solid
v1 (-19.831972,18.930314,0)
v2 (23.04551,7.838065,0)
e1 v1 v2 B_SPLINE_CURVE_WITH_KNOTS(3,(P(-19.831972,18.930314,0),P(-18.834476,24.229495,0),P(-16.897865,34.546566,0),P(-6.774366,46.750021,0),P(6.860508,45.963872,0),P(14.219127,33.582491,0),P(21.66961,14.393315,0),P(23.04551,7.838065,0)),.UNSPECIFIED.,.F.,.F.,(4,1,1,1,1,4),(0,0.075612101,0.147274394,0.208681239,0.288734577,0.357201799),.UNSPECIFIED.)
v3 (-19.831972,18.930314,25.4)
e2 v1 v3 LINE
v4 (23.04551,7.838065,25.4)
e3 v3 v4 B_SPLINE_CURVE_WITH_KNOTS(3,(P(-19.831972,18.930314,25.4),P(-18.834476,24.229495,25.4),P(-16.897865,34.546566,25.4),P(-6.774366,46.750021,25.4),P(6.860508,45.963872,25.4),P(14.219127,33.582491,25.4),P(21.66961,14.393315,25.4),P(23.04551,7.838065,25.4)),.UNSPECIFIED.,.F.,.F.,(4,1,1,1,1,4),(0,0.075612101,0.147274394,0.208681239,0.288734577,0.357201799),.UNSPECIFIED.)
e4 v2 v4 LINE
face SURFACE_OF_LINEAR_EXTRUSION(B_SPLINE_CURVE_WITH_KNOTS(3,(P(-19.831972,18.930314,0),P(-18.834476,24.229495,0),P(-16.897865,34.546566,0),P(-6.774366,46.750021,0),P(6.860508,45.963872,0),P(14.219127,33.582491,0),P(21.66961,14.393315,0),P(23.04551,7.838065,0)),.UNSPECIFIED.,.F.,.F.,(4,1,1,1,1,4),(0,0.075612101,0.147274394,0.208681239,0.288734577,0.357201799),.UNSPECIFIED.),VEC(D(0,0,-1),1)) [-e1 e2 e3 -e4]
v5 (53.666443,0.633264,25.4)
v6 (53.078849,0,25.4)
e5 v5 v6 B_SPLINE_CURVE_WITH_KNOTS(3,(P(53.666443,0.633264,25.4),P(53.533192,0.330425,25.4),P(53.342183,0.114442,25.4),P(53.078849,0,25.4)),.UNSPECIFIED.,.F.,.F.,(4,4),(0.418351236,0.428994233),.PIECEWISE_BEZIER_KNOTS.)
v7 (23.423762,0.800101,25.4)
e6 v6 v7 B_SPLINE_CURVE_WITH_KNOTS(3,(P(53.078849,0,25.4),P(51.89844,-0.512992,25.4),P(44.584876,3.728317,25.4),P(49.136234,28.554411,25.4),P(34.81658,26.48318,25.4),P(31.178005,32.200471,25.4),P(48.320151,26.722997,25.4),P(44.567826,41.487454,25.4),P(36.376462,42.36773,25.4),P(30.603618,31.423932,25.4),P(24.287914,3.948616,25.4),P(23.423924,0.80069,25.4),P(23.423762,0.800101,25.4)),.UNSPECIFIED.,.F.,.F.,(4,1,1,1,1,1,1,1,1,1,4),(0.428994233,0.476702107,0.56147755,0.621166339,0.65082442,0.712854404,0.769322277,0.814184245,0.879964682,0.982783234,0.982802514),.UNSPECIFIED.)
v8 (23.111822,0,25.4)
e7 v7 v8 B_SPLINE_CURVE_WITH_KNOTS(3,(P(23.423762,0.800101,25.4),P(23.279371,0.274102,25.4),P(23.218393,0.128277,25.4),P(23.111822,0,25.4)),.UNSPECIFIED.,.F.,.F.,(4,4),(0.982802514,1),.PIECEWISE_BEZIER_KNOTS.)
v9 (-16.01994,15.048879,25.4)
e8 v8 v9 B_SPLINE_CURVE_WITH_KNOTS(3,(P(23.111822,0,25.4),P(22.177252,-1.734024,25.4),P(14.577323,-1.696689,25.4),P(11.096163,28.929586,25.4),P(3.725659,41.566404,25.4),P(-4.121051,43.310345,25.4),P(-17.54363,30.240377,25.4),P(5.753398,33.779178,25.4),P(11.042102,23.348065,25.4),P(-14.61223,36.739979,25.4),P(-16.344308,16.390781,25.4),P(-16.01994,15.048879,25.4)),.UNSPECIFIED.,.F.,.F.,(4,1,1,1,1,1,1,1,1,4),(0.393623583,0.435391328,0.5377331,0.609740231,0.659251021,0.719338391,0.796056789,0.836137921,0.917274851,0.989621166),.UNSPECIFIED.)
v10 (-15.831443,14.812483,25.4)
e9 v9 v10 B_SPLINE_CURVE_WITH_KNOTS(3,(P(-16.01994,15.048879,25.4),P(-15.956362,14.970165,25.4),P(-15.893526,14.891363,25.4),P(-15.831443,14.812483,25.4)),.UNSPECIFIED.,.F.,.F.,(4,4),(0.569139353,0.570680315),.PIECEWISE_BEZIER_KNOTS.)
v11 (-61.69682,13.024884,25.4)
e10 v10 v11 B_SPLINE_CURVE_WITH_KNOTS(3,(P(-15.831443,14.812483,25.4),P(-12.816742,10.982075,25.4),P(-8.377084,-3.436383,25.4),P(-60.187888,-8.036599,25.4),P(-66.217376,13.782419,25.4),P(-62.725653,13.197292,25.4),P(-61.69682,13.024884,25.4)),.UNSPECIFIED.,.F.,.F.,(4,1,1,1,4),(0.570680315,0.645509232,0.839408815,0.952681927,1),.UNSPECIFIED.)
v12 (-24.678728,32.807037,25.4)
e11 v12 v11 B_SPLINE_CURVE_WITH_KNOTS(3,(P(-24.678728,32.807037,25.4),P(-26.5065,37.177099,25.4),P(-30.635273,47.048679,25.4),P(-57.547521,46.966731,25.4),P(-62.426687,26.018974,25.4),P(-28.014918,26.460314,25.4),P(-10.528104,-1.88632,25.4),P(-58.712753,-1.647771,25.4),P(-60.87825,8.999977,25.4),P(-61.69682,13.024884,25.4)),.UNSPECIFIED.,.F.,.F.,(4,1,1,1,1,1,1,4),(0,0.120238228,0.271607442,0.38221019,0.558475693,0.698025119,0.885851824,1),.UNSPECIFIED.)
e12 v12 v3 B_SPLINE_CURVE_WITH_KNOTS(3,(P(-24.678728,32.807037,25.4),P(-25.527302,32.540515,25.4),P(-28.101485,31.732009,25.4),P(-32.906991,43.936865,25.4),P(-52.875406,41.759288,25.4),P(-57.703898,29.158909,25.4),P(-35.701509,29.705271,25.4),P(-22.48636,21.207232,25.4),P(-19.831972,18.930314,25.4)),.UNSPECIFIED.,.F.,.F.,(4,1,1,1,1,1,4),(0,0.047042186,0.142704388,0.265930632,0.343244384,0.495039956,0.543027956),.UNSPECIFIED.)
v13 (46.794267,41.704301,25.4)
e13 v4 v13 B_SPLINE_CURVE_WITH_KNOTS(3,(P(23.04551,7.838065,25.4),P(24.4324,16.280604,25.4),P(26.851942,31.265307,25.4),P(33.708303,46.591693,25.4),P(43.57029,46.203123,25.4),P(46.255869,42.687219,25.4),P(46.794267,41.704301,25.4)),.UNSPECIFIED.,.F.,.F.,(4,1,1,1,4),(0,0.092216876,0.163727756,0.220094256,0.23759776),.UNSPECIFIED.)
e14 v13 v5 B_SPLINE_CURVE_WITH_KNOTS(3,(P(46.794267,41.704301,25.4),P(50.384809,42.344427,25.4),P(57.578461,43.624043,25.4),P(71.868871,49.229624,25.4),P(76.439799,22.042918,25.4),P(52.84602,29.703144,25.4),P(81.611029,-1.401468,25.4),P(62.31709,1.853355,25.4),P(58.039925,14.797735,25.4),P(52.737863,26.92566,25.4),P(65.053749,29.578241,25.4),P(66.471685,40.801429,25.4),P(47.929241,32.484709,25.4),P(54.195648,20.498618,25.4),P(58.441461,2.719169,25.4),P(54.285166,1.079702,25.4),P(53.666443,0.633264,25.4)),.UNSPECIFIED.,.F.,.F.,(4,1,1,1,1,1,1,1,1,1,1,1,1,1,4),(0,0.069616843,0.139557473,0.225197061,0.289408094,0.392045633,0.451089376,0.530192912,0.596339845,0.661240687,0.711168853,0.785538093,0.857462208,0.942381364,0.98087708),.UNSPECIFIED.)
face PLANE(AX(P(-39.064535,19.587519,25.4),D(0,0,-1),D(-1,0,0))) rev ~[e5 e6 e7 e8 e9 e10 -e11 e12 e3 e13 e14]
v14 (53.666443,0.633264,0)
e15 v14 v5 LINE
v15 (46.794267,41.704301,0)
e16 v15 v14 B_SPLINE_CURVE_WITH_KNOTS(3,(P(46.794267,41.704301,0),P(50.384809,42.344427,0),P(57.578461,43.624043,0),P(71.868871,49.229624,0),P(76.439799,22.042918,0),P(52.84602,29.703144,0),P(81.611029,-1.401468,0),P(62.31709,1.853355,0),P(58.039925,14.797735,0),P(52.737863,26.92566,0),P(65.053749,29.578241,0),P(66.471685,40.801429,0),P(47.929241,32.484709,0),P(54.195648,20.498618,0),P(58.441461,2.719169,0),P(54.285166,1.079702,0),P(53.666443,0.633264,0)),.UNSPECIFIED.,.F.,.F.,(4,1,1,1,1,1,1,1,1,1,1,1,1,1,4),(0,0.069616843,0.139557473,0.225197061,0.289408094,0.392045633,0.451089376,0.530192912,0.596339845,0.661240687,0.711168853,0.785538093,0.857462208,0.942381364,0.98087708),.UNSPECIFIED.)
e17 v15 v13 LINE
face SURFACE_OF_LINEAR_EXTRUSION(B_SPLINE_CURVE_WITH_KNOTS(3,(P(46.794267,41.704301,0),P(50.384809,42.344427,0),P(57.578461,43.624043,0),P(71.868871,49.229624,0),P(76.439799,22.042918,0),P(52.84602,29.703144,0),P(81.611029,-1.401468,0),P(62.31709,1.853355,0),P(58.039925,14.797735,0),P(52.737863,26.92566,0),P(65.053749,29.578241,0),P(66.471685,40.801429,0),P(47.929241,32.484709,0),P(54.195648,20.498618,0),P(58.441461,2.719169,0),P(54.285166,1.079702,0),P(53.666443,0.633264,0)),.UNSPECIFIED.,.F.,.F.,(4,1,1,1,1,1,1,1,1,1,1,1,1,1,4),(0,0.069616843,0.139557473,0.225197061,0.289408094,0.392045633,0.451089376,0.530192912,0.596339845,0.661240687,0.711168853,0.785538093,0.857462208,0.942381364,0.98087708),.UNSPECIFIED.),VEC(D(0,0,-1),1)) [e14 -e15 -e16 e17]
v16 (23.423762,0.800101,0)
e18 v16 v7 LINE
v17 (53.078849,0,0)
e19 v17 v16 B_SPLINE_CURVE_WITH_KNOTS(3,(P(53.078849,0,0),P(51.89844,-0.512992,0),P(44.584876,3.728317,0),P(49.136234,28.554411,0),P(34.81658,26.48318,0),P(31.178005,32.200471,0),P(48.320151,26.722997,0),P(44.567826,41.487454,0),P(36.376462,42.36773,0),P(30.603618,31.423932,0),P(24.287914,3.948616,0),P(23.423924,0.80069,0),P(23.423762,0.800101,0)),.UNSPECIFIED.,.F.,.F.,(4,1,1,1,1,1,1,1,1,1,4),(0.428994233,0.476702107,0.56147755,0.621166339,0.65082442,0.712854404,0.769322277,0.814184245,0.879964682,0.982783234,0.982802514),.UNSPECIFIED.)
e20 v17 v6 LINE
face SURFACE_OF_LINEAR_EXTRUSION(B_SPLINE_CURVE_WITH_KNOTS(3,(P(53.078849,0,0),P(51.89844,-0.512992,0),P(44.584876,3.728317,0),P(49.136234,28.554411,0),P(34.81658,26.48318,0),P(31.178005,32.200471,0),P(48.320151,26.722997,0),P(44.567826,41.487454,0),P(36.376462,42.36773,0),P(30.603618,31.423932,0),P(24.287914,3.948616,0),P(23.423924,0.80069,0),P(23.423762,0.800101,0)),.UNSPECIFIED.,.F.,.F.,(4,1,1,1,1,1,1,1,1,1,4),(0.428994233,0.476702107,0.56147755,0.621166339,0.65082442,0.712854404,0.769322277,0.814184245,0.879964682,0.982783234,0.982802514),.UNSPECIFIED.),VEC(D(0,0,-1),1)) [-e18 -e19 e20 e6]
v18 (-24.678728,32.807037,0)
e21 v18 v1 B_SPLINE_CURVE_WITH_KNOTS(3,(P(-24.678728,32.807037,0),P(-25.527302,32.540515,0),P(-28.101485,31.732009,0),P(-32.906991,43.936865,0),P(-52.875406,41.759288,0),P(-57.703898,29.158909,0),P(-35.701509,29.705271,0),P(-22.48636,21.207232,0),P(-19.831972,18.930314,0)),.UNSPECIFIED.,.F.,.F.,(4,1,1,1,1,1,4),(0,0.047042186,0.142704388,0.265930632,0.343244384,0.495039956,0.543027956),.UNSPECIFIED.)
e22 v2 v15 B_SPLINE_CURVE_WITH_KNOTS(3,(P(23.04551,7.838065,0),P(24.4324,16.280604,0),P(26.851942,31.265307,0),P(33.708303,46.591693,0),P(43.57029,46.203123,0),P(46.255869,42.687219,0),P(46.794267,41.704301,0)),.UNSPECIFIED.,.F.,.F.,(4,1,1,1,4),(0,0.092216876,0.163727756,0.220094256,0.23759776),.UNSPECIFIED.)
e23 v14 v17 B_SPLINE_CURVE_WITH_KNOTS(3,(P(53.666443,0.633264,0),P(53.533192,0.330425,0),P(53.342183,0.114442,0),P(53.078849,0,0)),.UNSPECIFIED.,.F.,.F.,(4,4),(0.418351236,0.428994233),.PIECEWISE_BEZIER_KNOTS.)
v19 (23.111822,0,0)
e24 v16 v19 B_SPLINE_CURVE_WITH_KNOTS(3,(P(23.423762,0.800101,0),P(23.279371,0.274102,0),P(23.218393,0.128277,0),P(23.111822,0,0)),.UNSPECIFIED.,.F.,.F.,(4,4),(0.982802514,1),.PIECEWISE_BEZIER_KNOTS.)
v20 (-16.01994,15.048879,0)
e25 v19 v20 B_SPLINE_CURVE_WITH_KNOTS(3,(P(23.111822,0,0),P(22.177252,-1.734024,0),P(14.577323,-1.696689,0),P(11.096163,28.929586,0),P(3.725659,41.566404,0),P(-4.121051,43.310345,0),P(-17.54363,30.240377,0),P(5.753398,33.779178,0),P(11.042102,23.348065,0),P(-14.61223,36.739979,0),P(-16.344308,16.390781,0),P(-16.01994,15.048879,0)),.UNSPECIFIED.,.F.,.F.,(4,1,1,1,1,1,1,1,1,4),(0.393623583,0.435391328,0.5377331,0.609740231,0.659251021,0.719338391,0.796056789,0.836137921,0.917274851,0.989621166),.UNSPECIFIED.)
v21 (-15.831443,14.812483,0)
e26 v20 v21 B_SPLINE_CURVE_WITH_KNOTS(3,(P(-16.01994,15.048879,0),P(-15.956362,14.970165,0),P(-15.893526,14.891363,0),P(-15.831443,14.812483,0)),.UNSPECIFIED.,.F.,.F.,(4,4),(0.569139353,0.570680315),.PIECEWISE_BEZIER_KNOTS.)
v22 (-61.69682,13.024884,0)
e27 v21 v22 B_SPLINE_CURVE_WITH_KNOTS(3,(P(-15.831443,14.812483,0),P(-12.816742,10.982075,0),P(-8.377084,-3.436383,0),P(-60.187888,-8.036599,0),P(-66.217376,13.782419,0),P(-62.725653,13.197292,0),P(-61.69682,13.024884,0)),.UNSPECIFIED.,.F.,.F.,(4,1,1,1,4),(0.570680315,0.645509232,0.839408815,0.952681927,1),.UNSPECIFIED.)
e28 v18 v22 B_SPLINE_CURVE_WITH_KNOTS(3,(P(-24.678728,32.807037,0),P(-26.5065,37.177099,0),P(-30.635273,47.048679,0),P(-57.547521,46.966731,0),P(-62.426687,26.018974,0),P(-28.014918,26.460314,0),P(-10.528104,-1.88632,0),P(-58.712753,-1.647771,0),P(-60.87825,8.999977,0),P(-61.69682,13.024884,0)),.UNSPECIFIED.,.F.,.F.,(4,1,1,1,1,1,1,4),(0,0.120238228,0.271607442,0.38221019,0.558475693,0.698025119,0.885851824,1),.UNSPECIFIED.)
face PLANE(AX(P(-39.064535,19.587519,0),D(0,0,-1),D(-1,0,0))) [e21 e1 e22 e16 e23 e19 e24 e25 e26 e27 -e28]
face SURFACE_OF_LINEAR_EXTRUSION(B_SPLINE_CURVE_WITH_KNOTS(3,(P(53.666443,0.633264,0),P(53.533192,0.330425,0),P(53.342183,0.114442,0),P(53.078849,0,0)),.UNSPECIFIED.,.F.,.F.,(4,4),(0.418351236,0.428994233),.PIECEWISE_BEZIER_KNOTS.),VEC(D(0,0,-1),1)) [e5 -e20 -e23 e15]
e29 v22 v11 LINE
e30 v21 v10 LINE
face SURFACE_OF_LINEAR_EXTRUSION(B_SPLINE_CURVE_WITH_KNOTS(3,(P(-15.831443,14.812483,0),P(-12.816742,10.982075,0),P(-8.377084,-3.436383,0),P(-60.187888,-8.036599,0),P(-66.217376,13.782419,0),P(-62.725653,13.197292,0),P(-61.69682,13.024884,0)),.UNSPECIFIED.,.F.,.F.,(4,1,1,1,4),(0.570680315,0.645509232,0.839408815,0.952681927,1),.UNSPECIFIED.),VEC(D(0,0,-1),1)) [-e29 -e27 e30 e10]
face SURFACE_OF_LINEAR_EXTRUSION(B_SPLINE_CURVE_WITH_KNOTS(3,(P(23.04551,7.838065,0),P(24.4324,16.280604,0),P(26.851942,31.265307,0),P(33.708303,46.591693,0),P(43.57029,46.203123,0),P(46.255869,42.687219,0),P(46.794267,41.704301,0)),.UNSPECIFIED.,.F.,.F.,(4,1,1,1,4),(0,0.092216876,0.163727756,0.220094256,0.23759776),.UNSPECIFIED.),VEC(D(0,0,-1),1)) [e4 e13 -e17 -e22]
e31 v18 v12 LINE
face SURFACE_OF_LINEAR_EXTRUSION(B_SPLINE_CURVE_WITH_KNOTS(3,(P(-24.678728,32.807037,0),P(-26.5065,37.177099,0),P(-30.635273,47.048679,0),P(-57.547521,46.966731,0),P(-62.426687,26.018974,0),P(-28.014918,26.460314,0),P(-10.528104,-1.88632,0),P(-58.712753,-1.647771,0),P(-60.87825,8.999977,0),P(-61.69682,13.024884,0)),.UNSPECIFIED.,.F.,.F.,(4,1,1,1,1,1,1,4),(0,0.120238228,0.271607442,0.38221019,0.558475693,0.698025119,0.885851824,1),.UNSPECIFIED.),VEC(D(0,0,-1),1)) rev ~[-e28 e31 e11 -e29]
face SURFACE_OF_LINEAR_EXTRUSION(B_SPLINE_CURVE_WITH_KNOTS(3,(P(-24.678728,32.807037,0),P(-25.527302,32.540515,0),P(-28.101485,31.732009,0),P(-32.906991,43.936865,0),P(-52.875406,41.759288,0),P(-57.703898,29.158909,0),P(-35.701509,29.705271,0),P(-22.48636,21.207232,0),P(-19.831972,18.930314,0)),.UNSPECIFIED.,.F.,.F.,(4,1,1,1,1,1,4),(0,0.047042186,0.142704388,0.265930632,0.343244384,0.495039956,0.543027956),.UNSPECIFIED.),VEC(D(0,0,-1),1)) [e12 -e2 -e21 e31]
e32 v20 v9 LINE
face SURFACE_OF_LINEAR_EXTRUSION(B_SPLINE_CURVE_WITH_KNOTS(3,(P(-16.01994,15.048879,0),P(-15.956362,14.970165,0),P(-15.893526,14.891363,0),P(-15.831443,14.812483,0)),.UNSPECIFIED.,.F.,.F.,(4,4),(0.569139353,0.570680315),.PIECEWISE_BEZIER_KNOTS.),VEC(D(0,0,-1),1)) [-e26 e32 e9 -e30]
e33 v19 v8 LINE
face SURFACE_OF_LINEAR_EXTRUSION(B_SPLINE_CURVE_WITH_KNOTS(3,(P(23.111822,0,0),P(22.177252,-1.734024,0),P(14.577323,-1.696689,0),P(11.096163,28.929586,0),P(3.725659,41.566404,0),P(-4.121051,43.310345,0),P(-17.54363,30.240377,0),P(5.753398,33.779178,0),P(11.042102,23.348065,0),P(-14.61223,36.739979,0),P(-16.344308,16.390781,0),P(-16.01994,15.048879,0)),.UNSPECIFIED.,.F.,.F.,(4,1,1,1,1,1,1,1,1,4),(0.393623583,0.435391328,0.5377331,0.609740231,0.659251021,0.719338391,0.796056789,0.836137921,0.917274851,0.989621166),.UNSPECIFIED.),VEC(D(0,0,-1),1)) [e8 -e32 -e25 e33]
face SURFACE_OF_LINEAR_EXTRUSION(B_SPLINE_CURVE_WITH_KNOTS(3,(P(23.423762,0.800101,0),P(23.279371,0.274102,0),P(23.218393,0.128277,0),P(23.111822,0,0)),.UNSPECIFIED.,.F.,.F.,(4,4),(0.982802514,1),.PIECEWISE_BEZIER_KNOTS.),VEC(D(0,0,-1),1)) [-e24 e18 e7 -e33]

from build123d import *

# Parameters (mm, degrees)
F1_DEPTH = 25.4


# Not quite as in the source:
# - ends of sketch curves that miss each other by under 0.0002 mm in the source are joined


with BuildPart() as f1:
    # F0 (on Top) → F1 (new body)
    with BuildSketch(Plane.XY):
        with BuildLine():
            add(Edge.make_bspline(
                [(-24.6787276119, 32.8070372343), (-25.5273015557, 32.5405150057), (-28.1014851586, 31.7320089754), (-32.90699094, 43.9368654397), (-52.875406472, 41.759288149), (-57.7038976314, 29.1589085216), (-35.7015094106, 29.7052712427), (-22.4863598149, 21.2072316293), (-19.8319724851, 18.9303140968)],
                knots=[0, 0, 0, 0, 0.0470421865, 0.1427043876, 0.2659306317, 0.3432443836, 0.4950399565, 0.5430279559, 0.5430279559, 0.5430279559, 0.5430279559], degree=3))
            add(Edge.make_bspline(
                [(-24.6787276119, 32.8070372343), (-26.5064995292, 37.1770989066), (-30.6352734039, 47.0486787753), (-57.5475208508, 46.96673089), (-62.4266866267, 26.0189740304), (-28.0149183626, 26.4603141136), (-10.52810376, -1.8863198777), (-58.7127529187, -1.6477709858), (-60.8782500601, 8.9999767274), (-61.6968199611, 13.0248842761)],
                knots=[0, 0, 0, 0, 0.1202382283, 0.2716074424, 0.38221019, 0.5584756929, 0.6980251192, 0.8858518243, 1, 1, 1, 1], degree=3))
            add(Edge.make_bspline(
                [(-15.8314434419, 14.8124826193), (-12.8167424406, 10.9820745517), (-8.3770839751, -3.436383487), (-60.1878877743, -8.036598746), (-66.2173758507, 13.782419329), (-62.7256533774, 13.1972916958), (-61.6968199611, 13.0248842761)],
                knots=[0.5706803148, 0.5706803148, 0.5706803148, 0.5706803148, 0.6455092316, 0.8394088149, 0.9526819274, 1, 1, 1, 1], degree=3))
            add(Edge.make_bspline(
                [(-16.0199403512, 15.048879084), (-15.97340642, 14.8563692593), (-15.9033936949, 14.8336509493), (-15.8314434419, 14.8124826193)],
                knots=[0.9896211656, 0.9896211656, 0.9896211656, 0.9896211656, 1, 1, 1, 1], degree=3))
            add(Edge.make_bspline(
                [(-19.8319724851, 18.9303140968), (-18.387658044, 17.6913898312), (-17.0972678041, 16.3826850288), (-16.0199403512, 15.048879084)],
                knots=[0.5430279559, 0.5430279559, 0.5430279559, 0.5430279559, 0.5691393526, 0.5691393526, 0.5691393526, 0.5691393526], degree=3))
        make_face()
        with BuildLine():
            add(Edge.make_bspline(
                [(-19.8319724851, 18.9303140968), (-18.8344760031, 24.2294951854), (-16.8978653598, 34.5465657632), (-6.7743663409, 46.7500210317), (6.8605077442, 45.9638720477), (14.2191273717, 33.5824908681), (21.6696104289, 14.3933148786), (23.0455104144, 7.8380652192)],
                knots=[0, 0, 0, 0, 0.0756121009, 0.147274394, 0.2086812387, 0.2887345767, 0.3572017989, 0.3572017989, 0.3572017989, 0.3572017989], degree=3))
            add(Edge.make_bspline(
                [(-19.8319724851, 18.9303140968), (-18.387658044, 17.6913898312), (-17.0972678041, 16.3826850288), (-16.0199403512, 15.048879084)],
                knots=[0.5430279559, 0.5430279559, 0.5430279559, 0.5430279559, 0.5691393526, 0.5691393526, 0.5691393526, 0.5691393526], degree=3))
            add(Edge.make_bspline(
                [(23.1118220836, 0), (22.177252315, -1.7340239565), (14.5773230299, -1.6966887198), (11.0961627452, 28.9295857186), (3.7256594235, 41.5664043956), (-4.1210514113, 43.3103447304), (-17.5436302823, 30.2403774921), (5.7533981015, 33.779177956), (11.0421016778, 23.3480646444), (-14.612230045, 36.7399787183), (-16.3443080286, 16.3907808564), (-16.0199403512, 15.048879084)],
                knots=[0.393623583, 0.393623583, 0.393623583, 0.393623583, 0.4353913281, 0.5377331001, 0.609740231, 0.6592510214, 0.7193383912, 0.7960567893, 0.8361379212, 0.917274851, 0.9896211656, 0.9896211656, 0.9896211656, 0.9896211656], degree=3))
            add(Edge.make_bspline(
                [(23.4237621025, 0.8001007005), (23.3421922869, 0.5029517859), (23.2386923409, 0.2353982259), (23.1118220836, 0)],
                knots=[0.3879535039, 0.3879535039, 0.3879535039, 0.3879535039, 0.393623583, 0.393623583, 0.393623583, 0.393623583], degree=3))
            add(Edge.make_bspline(
                [(23.0455104144, 7.8380652192), (23.6634889039, 4.8938081328), (23.86615644, 2.4116894523), (23.4237621025, 0.8001007005)],
                knots=[0.3572017989, 0.3572017989, 0.3572017989, 0.3572017989, 0.3879535039, 0.3879535039, 0.3879535039, 0.3879535039], degree=3))
        make_face()
        with BuildLine():
            add(Edge.make_bspline(
                [(-16.0199403512, 15.048879084), (-15.97340642, 14.8563692593), (-15.9033936949, 14.8336509493), (-15.8314434419, 14.8124826193)],
                knots=[0.9896211656, 0.9896211656, 0.9896211656, 0.9896211656, 1, 1, 1, 1], degree=3))
            add(Edge.make_bspline(
                [(-16.0199403512, 15.048879084), (-15.9563619495, 14.9701646226), (-15.8935255947, 14.89136274), (-15.8314434419, 14.8124826193)],
                knots=[0.5691393526, 0.5691393526, 0.5691393526, 0.5691393526, 0.5706803148, 0.5706803148, 0.5706803148, 0.5706803148], degree=3))
        make_face()
        with BuildLine():
            add(Edge.make_bspline(
                [(23.0455104144, 7.8380652192), (24.4324002035, 16.2806044304), (26.8519423128, 31.2653069215), (33.7083031751, 46.5916934343), (43.5702899083, 46.203123325), (46.2558693347, 42.6872189335), (46.7942668802, 41.7043013302)],
                knots=[0, 0, 0, 0, 0.0922168762, 0.1637277559, 0.2200942558, 0.23759776, 0.23759776, 0.23759776, 0.23759776], degree=3))
            add(Edge.make_bspline(
                [(23.0455104144, 7.8380652192), (23.6634889039, 4.8938081328), (23.86615644, 2.4116894523), (23.4237621025, 0.8001007005)],
                knots=[0.3572017989, 0.3572017989, 0.3572017989, 0.3572017989, 0.3879535039, 0.3879535039, 0.3879535039, 0.3879535039], degree=3))
            add(Edge.make_bspline(
                [(53.0788488686, 0), (51.8984399331, -0.5129918214), (44.5848763075, 3.7283170523), (49.1362338719, 28.5544108949), (34.8165799276, 26.4831796905), (31.1780051516, 32.2004713219), (48.3201512021, 26.7229973916), (44.5678259808, 41.4874538831), (36.376462422, 42.3677304518), (30.6036182602, 31.4239322121), (24.2879136847, 3.9486155232), (23.4239237173, 0.8006904499), (23.4237621025, 0.8001007005)],
                knots=[0.4289942329, 0.4289942329, 0.4289942329, 0.4289942329, 0.4767021069, 0.5614775501, 0.6211663392, 0.6508244204, 0.7128544037, 0.7693222766, 0.8141842446, 0.8799646816, 0.9827832344, 0.9828025139, 0.9828025139, 0.9828025139, 0.9828025139], degree=3))
            add(Edge.make_bspline(
                [(53.6664426327, 0.63326415), (53.3590889397, 0.4114939862), (53.2189711295, 0.2057502607), (53.0788488686, 0)],
                knots=[0.9808770796, 0.9808770796, 0.9808770796, 0.9808770796, 1, 1, 1, 1], degree=3))
            add(Edge.make_bspline(
                [(46.7942668802, 41.7043013302), (48.6032933073, 38.4016786955), (50.3660101546, 25.8827463669), (53.5382364777, 8.1673975806), (54.0836898285, 1.5815416662), (53.6664426327, 0.63326415)],
                knots=[0.23759776, 0.23759776, 0.23759776, 0.23759776, 0.2964098812, 0.385024933, 0.4183512362, 0.4183512362, 0.4183512362, 0.4183512362], degree=3))
        make_face()
        with BuildLine():
            add(Edge.make_bspline(
                [(23.4237621025, 0.8001007005), (23.3421922869, 0.5029517859), (23.2386923409, 0.2353982259), (23.1118220836, 0)],
                knots=[0.3879535039, 0.3879535039, 0.3879535039, 0.3879535039, 0.393623583, 0.393623583, 0.393623583, 0.393623583], degree=3))
            add(Edge.make_bspline(
                [(23.4237621025, 0.8001007005), (23.2793710251, 0.2741020489), (23.2183930531, 0.1282770233), (23.1118220836, 0)],
                knots=[0.9828025139, 0.9828025139, 0.9828025139, 0.9828025139, 1, 1, 1, 1], degree=3))
        make_face()
        with BuildLine():
            add(Edge.make_bspline(
                [(46.7942668802, 41.7043013302), (50.3848090207, 42.3444269721), (57.5784609028, 43.6240432253), (71.8688709785, 49.2296239678), (76.4397987852, 22.0429179865), (52.8460197012, 29.7031437768), (81.6110286462, -1.4014680593), (62.3170902407, 1.8533546119), (58.0399247272, 14.7977347688), (52.7378625165, 26.9256595732), (65.0537492941, 29.5782405699), (66.4716848994, 40.8014290246), (47.9292406475, 32.4847086055), (54.1956479046, 20.498618098), (58.4414610746, 2.7191685618), (54.2851661425, 1.0797023003), (53.6664426327, 0.63326415)],
                knots=[0, 0, 0, 0, 0.0696168426, 0.139557473, 0.2251970613, 0.2894080935, 0.3920456325, 0.4510893761, 0.5301929119, 0.5963398453, 0.6612406867, 0.7111688526, 0.7855380932, 0.8574622076, 0.9423813637, 0.9808770796, 0.9808770796, 0.9808770796, 0.9808770796], degree=3))
            add(Edge.make_bspline(
                [(46.7942668802, 41.7043013302), (48.6032933073, 38.4016786955), (50.3660101546, 25.8827463669), (53.5382364777, 8.1673975806), (54.0836898285, 1.5815416662), (53.6664426327, 0.63326415)],
                knots=[0.23759776, 0.23759776, 0.23759776, 0.23759776, 0.2964098812, 0.385024933, 0.4183512362, 0.4183512362, 0.4183512362, 0.4183512362], degree=3))
        make_face()
        with BuildLine():
            add(Edge.make_bspline(
                [(53.6664426327, 0.63326415), (53.3590889397, 0.4114939862), (53.2189711295, 0.2057502607), (53.0788488686, 0)],
                knots=[0.9808770796, 0.9808770796, 0.9808770796, 0.9808770796, 1, 1, 1, 1], degree=3))
            add(Edge.make_bspline(
                [(53.6664426327, 0.63326415), (53.5331917132, 0.3304248446), (53.342182515, 0.1144417014), (53.0788488686, 0)],
                knots=[0.4183512362, 0.4183512362, 0.4183512362, 0.4183512362, 0.4289942329, 0.4289942329, 0.4289942329, 0.4289942329], degree=3))
        make_face()
    extrude(amount=F1_DEPTH)


solid = f1.part
